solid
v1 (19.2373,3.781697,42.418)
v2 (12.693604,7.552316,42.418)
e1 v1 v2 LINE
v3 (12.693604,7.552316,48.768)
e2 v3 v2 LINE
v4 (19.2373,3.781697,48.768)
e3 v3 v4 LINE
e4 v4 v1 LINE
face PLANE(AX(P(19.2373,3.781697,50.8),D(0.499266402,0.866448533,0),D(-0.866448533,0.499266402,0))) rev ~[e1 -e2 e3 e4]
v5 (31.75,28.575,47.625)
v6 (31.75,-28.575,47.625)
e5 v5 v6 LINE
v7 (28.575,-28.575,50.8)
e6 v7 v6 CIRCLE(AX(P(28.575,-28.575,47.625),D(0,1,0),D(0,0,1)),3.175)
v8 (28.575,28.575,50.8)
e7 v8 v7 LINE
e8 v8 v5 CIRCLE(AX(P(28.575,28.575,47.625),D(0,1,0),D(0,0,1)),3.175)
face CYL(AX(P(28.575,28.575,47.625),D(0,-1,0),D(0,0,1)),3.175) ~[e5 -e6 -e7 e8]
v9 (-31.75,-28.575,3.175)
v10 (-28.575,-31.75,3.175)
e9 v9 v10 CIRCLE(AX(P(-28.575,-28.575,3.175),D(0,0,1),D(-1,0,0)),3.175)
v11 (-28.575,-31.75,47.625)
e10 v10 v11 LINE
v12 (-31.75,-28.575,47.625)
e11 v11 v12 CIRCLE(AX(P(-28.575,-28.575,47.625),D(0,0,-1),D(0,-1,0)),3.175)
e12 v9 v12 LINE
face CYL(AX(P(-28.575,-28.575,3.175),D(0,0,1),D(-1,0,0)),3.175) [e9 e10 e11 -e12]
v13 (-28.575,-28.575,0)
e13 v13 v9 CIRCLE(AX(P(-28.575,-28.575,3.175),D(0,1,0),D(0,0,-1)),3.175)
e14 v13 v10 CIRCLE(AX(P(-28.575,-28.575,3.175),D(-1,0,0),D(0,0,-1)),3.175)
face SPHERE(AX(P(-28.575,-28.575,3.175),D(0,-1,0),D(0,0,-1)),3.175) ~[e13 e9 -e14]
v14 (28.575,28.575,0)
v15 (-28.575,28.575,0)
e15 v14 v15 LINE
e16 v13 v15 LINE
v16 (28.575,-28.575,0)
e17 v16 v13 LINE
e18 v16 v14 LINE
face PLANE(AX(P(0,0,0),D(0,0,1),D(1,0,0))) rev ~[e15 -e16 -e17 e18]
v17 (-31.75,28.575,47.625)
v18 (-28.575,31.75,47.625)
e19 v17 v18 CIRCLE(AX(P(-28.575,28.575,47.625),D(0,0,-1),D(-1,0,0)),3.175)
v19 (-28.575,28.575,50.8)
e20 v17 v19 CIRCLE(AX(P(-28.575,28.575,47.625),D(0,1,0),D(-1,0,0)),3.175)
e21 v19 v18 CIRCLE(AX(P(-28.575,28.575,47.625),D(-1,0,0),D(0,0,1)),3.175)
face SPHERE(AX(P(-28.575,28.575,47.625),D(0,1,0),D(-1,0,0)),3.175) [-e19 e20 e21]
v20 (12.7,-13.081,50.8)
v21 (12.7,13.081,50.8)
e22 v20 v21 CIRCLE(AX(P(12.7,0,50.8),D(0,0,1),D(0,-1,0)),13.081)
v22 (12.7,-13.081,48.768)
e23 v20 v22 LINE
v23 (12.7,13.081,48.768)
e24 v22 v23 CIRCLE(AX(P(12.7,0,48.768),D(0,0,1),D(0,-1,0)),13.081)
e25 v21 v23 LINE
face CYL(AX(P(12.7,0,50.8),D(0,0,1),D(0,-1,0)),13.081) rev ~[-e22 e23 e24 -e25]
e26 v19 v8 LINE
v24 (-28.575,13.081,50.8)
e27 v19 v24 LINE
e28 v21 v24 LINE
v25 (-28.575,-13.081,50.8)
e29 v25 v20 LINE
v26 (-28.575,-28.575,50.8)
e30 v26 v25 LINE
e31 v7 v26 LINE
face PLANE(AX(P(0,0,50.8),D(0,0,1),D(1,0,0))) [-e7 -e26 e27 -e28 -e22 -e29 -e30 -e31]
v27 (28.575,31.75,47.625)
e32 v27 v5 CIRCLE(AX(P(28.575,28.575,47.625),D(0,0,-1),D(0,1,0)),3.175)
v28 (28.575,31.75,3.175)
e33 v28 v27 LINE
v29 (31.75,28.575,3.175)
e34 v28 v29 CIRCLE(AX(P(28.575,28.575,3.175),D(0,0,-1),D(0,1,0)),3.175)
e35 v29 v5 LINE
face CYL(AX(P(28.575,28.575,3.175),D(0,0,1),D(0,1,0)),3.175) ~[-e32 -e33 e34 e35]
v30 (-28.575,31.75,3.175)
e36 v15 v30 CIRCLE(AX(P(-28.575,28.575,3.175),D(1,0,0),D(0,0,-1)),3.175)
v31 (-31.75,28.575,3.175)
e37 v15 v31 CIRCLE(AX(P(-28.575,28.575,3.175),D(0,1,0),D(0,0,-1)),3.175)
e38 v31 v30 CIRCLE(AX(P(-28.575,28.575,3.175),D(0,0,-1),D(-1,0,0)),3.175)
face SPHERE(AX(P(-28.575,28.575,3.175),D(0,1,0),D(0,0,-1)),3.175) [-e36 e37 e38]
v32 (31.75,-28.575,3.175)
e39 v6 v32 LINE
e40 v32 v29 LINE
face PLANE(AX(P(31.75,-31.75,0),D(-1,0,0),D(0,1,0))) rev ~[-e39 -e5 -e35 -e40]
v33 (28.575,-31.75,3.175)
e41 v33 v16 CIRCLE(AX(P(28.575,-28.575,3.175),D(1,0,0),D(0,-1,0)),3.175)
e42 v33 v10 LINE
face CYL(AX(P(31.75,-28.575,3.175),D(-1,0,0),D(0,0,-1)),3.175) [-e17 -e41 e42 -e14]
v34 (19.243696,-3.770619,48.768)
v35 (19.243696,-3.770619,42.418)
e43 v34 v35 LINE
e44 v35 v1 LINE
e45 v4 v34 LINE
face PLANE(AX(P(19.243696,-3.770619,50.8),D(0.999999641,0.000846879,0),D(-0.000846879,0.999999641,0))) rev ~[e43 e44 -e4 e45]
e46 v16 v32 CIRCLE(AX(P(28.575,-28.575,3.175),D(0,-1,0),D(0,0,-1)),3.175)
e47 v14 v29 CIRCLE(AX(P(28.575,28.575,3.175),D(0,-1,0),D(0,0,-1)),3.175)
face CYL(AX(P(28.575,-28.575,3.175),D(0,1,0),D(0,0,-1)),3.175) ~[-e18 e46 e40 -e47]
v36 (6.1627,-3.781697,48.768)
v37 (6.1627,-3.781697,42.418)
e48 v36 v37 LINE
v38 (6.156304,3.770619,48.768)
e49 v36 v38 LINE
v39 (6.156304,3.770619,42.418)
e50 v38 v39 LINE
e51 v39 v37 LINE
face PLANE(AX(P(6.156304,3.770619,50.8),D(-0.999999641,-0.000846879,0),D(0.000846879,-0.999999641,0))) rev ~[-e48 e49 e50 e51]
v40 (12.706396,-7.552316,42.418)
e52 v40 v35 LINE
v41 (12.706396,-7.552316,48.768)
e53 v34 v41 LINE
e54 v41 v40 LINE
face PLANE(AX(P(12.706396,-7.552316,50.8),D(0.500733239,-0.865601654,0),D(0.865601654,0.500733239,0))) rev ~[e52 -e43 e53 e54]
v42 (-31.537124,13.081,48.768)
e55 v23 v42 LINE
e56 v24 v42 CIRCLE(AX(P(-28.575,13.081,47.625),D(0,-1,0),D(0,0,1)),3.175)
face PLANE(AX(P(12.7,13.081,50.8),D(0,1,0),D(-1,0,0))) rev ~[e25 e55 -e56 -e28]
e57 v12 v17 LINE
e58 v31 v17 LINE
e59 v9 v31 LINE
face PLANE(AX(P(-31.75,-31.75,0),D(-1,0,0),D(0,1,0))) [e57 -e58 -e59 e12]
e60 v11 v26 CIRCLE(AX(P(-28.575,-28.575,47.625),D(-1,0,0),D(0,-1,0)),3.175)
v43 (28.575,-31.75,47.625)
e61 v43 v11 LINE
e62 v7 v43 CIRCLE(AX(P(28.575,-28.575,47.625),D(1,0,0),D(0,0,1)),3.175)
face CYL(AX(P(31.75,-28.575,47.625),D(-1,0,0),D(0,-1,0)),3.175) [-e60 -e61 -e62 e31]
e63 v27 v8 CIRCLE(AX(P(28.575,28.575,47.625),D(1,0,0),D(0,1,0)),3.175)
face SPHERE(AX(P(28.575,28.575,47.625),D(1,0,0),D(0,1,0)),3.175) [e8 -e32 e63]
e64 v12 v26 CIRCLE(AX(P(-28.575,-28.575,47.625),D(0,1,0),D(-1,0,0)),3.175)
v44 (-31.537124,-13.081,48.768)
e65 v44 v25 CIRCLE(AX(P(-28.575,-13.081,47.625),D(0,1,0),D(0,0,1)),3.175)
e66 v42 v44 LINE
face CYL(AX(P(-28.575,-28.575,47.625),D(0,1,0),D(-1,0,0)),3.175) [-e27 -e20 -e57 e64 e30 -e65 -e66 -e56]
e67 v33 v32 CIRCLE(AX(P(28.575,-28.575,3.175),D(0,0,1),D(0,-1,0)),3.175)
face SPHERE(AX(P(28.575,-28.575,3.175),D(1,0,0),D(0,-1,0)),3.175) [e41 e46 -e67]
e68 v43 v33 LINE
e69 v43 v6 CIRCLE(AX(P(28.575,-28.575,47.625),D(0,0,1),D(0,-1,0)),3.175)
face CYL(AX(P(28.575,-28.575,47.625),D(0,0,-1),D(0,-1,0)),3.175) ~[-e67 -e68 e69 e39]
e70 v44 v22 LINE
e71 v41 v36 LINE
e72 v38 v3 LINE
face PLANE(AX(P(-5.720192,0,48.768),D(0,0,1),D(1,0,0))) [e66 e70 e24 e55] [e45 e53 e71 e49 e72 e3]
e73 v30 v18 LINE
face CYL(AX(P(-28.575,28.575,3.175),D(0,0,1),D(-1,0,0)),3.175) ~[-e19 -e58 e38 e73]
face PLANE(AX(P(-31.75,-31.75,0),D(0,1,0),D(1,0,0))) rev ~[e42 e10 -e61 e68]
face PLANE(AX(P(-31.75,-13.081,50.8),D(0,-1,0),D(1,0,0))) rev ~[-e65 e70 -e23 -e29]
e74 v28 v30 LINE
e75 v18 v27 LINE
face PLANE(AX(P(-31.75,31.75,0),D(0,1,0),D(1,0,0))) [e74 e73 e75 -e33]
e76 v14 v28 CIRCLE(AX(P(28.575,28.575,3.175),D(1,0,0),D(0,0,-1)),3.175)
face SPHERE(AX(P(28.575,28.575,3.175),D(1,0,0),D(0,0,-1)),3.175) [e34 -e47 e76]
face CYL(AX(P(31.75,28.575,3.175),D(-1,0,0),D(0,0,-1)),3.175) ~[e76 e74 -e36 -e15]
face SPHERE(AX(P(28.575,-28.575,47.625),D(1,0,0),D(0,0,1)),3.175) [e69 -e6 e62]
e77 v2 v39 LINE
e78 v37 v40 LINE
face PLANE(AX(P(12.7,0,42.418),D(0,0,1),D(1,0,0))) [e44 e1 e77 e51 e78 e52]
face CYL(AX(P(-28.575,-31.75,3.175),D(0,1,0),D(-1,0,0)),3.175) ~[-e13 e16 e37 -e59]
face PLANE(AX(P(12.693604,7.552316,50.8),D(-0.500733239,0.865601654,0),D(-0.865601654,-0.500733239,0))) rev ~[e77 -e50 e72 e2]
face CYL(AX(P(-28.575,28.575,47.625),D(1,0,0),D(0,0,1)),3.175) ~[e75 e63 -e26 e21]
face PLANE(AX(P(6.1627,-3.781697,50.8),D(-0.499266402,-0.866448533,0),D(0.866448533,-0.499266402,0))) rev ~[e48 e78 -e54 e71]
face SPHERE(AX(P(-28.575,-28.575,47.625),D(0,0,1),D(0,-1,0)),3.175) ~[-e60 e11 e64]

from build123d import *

# Parameters (mm, degrees)
F0_W     = 63.5
F0_H     = 63.5
F1_DEPTH = 50.8
F4_DEPTH = 2.032
F2_W     = 1.5281873676
F2_H     = 5.9584317987
F5_DEPTH = 8.382
F6_F1_R  = 3.175
F6_F2_R  = 3.175
F6_F3_R  = 3.175
F6_F4_R  = 3.175
F6_F5_R  = 3.175


with BuildPart() as f1:
    # F0 (on Top) → F1 (new body)
    with BuildSketch(Plane.XY):
        Rectangle(F0_W, F0_H)
    extrude(amount=F1_DEPTH)

    # F3 (on face) → F4 (cut)
    with BuildSketch(Plane.XY.offset(50.8)):
        with BuildLine():
            Line((-31.75, -13.081), (12.7, -13.081))
            ThreePointArc((12.7, -13.081), (25.781, 0), (12.7, 13.081))
            Line((12.7, 13.081), (-31.75, 13.081))
            Line((-31.75, 13.081), (-31.75, -13.081))
        make_face()
        Polygon((12.7063958977, -7.552316163), (6.1627002943, -3.7816970914), (6.1563043966, 3.7706190716), (12.6936041023, 7.552316163), (19.2372997057, 3.7816970914), (19.2436956034, -3.7706190716), align=None, mode=Mode.SUBTRACT)
    extrude(amount=-F4_DEPTH, mode=Mode.SUBTRACT)

    # F2 (on face) → F5 (cut)
    with BuildSketch(Plane.XY.offset(50.8)):
        with Locations((145.2675004168, 51.4206579864)):
            Rectangle(F2_W, F2_H)
        Polygon((12.6936041023, 7.552316163), (6.1563043966, 3.7706190716), (6.1627002943, -3.7816970914), (12.7063958977, -7.552316163), (19.2436956034, -3.7706190716), (19.2372997057, 3.7816970914), align=None)
    extrude(amount=-F5_DEPTH, mode=Mode.SUBTRACT)

    # F6: fillet of radius 3.175 on 13 edges, made by hand

    # F6_f1
    f6_f1_edges = [f1.edges().sort_by_distance(p)[0] for p in [
        (-31.75, 0, 0),
    ]]
    fillet(f6_f1_edges, radius=F6_F1_R)

    # F6_f2
    f6_f2_edges = [f1.edges().sort_by_distance(p)[0] for p in [
        (-31.75, -31.75, 26.9875),
    ]]
    fillet(f6_f2_edges, radius=F6_F2_R)

    # F6_f3
    f6_f3_edges = [f1.edges().sort_by_distance(p)[0] for p in [
        (-31.75, -20.828, 50.8),
    ]]
    fillet(f6_f3_edges, radius=F6_F3_R)

    # F6_f4
    f6_f4_edges = [f1.edges().sort_by_distance(p)[0] for p in [
        (-31.75, 31.75, 25.4),
    ]]
    fillet(f6_f4_edges, radius=F6_F4_R)

    # F6_f5
    f6_f5_edges = [f1.edges().sort_by_distance(p)[0] for p in [
        (31.75, 0, 0),
    ]]
    fillet(f6_f5_edges, radius=F6_F5_R)


solid = f1.part
